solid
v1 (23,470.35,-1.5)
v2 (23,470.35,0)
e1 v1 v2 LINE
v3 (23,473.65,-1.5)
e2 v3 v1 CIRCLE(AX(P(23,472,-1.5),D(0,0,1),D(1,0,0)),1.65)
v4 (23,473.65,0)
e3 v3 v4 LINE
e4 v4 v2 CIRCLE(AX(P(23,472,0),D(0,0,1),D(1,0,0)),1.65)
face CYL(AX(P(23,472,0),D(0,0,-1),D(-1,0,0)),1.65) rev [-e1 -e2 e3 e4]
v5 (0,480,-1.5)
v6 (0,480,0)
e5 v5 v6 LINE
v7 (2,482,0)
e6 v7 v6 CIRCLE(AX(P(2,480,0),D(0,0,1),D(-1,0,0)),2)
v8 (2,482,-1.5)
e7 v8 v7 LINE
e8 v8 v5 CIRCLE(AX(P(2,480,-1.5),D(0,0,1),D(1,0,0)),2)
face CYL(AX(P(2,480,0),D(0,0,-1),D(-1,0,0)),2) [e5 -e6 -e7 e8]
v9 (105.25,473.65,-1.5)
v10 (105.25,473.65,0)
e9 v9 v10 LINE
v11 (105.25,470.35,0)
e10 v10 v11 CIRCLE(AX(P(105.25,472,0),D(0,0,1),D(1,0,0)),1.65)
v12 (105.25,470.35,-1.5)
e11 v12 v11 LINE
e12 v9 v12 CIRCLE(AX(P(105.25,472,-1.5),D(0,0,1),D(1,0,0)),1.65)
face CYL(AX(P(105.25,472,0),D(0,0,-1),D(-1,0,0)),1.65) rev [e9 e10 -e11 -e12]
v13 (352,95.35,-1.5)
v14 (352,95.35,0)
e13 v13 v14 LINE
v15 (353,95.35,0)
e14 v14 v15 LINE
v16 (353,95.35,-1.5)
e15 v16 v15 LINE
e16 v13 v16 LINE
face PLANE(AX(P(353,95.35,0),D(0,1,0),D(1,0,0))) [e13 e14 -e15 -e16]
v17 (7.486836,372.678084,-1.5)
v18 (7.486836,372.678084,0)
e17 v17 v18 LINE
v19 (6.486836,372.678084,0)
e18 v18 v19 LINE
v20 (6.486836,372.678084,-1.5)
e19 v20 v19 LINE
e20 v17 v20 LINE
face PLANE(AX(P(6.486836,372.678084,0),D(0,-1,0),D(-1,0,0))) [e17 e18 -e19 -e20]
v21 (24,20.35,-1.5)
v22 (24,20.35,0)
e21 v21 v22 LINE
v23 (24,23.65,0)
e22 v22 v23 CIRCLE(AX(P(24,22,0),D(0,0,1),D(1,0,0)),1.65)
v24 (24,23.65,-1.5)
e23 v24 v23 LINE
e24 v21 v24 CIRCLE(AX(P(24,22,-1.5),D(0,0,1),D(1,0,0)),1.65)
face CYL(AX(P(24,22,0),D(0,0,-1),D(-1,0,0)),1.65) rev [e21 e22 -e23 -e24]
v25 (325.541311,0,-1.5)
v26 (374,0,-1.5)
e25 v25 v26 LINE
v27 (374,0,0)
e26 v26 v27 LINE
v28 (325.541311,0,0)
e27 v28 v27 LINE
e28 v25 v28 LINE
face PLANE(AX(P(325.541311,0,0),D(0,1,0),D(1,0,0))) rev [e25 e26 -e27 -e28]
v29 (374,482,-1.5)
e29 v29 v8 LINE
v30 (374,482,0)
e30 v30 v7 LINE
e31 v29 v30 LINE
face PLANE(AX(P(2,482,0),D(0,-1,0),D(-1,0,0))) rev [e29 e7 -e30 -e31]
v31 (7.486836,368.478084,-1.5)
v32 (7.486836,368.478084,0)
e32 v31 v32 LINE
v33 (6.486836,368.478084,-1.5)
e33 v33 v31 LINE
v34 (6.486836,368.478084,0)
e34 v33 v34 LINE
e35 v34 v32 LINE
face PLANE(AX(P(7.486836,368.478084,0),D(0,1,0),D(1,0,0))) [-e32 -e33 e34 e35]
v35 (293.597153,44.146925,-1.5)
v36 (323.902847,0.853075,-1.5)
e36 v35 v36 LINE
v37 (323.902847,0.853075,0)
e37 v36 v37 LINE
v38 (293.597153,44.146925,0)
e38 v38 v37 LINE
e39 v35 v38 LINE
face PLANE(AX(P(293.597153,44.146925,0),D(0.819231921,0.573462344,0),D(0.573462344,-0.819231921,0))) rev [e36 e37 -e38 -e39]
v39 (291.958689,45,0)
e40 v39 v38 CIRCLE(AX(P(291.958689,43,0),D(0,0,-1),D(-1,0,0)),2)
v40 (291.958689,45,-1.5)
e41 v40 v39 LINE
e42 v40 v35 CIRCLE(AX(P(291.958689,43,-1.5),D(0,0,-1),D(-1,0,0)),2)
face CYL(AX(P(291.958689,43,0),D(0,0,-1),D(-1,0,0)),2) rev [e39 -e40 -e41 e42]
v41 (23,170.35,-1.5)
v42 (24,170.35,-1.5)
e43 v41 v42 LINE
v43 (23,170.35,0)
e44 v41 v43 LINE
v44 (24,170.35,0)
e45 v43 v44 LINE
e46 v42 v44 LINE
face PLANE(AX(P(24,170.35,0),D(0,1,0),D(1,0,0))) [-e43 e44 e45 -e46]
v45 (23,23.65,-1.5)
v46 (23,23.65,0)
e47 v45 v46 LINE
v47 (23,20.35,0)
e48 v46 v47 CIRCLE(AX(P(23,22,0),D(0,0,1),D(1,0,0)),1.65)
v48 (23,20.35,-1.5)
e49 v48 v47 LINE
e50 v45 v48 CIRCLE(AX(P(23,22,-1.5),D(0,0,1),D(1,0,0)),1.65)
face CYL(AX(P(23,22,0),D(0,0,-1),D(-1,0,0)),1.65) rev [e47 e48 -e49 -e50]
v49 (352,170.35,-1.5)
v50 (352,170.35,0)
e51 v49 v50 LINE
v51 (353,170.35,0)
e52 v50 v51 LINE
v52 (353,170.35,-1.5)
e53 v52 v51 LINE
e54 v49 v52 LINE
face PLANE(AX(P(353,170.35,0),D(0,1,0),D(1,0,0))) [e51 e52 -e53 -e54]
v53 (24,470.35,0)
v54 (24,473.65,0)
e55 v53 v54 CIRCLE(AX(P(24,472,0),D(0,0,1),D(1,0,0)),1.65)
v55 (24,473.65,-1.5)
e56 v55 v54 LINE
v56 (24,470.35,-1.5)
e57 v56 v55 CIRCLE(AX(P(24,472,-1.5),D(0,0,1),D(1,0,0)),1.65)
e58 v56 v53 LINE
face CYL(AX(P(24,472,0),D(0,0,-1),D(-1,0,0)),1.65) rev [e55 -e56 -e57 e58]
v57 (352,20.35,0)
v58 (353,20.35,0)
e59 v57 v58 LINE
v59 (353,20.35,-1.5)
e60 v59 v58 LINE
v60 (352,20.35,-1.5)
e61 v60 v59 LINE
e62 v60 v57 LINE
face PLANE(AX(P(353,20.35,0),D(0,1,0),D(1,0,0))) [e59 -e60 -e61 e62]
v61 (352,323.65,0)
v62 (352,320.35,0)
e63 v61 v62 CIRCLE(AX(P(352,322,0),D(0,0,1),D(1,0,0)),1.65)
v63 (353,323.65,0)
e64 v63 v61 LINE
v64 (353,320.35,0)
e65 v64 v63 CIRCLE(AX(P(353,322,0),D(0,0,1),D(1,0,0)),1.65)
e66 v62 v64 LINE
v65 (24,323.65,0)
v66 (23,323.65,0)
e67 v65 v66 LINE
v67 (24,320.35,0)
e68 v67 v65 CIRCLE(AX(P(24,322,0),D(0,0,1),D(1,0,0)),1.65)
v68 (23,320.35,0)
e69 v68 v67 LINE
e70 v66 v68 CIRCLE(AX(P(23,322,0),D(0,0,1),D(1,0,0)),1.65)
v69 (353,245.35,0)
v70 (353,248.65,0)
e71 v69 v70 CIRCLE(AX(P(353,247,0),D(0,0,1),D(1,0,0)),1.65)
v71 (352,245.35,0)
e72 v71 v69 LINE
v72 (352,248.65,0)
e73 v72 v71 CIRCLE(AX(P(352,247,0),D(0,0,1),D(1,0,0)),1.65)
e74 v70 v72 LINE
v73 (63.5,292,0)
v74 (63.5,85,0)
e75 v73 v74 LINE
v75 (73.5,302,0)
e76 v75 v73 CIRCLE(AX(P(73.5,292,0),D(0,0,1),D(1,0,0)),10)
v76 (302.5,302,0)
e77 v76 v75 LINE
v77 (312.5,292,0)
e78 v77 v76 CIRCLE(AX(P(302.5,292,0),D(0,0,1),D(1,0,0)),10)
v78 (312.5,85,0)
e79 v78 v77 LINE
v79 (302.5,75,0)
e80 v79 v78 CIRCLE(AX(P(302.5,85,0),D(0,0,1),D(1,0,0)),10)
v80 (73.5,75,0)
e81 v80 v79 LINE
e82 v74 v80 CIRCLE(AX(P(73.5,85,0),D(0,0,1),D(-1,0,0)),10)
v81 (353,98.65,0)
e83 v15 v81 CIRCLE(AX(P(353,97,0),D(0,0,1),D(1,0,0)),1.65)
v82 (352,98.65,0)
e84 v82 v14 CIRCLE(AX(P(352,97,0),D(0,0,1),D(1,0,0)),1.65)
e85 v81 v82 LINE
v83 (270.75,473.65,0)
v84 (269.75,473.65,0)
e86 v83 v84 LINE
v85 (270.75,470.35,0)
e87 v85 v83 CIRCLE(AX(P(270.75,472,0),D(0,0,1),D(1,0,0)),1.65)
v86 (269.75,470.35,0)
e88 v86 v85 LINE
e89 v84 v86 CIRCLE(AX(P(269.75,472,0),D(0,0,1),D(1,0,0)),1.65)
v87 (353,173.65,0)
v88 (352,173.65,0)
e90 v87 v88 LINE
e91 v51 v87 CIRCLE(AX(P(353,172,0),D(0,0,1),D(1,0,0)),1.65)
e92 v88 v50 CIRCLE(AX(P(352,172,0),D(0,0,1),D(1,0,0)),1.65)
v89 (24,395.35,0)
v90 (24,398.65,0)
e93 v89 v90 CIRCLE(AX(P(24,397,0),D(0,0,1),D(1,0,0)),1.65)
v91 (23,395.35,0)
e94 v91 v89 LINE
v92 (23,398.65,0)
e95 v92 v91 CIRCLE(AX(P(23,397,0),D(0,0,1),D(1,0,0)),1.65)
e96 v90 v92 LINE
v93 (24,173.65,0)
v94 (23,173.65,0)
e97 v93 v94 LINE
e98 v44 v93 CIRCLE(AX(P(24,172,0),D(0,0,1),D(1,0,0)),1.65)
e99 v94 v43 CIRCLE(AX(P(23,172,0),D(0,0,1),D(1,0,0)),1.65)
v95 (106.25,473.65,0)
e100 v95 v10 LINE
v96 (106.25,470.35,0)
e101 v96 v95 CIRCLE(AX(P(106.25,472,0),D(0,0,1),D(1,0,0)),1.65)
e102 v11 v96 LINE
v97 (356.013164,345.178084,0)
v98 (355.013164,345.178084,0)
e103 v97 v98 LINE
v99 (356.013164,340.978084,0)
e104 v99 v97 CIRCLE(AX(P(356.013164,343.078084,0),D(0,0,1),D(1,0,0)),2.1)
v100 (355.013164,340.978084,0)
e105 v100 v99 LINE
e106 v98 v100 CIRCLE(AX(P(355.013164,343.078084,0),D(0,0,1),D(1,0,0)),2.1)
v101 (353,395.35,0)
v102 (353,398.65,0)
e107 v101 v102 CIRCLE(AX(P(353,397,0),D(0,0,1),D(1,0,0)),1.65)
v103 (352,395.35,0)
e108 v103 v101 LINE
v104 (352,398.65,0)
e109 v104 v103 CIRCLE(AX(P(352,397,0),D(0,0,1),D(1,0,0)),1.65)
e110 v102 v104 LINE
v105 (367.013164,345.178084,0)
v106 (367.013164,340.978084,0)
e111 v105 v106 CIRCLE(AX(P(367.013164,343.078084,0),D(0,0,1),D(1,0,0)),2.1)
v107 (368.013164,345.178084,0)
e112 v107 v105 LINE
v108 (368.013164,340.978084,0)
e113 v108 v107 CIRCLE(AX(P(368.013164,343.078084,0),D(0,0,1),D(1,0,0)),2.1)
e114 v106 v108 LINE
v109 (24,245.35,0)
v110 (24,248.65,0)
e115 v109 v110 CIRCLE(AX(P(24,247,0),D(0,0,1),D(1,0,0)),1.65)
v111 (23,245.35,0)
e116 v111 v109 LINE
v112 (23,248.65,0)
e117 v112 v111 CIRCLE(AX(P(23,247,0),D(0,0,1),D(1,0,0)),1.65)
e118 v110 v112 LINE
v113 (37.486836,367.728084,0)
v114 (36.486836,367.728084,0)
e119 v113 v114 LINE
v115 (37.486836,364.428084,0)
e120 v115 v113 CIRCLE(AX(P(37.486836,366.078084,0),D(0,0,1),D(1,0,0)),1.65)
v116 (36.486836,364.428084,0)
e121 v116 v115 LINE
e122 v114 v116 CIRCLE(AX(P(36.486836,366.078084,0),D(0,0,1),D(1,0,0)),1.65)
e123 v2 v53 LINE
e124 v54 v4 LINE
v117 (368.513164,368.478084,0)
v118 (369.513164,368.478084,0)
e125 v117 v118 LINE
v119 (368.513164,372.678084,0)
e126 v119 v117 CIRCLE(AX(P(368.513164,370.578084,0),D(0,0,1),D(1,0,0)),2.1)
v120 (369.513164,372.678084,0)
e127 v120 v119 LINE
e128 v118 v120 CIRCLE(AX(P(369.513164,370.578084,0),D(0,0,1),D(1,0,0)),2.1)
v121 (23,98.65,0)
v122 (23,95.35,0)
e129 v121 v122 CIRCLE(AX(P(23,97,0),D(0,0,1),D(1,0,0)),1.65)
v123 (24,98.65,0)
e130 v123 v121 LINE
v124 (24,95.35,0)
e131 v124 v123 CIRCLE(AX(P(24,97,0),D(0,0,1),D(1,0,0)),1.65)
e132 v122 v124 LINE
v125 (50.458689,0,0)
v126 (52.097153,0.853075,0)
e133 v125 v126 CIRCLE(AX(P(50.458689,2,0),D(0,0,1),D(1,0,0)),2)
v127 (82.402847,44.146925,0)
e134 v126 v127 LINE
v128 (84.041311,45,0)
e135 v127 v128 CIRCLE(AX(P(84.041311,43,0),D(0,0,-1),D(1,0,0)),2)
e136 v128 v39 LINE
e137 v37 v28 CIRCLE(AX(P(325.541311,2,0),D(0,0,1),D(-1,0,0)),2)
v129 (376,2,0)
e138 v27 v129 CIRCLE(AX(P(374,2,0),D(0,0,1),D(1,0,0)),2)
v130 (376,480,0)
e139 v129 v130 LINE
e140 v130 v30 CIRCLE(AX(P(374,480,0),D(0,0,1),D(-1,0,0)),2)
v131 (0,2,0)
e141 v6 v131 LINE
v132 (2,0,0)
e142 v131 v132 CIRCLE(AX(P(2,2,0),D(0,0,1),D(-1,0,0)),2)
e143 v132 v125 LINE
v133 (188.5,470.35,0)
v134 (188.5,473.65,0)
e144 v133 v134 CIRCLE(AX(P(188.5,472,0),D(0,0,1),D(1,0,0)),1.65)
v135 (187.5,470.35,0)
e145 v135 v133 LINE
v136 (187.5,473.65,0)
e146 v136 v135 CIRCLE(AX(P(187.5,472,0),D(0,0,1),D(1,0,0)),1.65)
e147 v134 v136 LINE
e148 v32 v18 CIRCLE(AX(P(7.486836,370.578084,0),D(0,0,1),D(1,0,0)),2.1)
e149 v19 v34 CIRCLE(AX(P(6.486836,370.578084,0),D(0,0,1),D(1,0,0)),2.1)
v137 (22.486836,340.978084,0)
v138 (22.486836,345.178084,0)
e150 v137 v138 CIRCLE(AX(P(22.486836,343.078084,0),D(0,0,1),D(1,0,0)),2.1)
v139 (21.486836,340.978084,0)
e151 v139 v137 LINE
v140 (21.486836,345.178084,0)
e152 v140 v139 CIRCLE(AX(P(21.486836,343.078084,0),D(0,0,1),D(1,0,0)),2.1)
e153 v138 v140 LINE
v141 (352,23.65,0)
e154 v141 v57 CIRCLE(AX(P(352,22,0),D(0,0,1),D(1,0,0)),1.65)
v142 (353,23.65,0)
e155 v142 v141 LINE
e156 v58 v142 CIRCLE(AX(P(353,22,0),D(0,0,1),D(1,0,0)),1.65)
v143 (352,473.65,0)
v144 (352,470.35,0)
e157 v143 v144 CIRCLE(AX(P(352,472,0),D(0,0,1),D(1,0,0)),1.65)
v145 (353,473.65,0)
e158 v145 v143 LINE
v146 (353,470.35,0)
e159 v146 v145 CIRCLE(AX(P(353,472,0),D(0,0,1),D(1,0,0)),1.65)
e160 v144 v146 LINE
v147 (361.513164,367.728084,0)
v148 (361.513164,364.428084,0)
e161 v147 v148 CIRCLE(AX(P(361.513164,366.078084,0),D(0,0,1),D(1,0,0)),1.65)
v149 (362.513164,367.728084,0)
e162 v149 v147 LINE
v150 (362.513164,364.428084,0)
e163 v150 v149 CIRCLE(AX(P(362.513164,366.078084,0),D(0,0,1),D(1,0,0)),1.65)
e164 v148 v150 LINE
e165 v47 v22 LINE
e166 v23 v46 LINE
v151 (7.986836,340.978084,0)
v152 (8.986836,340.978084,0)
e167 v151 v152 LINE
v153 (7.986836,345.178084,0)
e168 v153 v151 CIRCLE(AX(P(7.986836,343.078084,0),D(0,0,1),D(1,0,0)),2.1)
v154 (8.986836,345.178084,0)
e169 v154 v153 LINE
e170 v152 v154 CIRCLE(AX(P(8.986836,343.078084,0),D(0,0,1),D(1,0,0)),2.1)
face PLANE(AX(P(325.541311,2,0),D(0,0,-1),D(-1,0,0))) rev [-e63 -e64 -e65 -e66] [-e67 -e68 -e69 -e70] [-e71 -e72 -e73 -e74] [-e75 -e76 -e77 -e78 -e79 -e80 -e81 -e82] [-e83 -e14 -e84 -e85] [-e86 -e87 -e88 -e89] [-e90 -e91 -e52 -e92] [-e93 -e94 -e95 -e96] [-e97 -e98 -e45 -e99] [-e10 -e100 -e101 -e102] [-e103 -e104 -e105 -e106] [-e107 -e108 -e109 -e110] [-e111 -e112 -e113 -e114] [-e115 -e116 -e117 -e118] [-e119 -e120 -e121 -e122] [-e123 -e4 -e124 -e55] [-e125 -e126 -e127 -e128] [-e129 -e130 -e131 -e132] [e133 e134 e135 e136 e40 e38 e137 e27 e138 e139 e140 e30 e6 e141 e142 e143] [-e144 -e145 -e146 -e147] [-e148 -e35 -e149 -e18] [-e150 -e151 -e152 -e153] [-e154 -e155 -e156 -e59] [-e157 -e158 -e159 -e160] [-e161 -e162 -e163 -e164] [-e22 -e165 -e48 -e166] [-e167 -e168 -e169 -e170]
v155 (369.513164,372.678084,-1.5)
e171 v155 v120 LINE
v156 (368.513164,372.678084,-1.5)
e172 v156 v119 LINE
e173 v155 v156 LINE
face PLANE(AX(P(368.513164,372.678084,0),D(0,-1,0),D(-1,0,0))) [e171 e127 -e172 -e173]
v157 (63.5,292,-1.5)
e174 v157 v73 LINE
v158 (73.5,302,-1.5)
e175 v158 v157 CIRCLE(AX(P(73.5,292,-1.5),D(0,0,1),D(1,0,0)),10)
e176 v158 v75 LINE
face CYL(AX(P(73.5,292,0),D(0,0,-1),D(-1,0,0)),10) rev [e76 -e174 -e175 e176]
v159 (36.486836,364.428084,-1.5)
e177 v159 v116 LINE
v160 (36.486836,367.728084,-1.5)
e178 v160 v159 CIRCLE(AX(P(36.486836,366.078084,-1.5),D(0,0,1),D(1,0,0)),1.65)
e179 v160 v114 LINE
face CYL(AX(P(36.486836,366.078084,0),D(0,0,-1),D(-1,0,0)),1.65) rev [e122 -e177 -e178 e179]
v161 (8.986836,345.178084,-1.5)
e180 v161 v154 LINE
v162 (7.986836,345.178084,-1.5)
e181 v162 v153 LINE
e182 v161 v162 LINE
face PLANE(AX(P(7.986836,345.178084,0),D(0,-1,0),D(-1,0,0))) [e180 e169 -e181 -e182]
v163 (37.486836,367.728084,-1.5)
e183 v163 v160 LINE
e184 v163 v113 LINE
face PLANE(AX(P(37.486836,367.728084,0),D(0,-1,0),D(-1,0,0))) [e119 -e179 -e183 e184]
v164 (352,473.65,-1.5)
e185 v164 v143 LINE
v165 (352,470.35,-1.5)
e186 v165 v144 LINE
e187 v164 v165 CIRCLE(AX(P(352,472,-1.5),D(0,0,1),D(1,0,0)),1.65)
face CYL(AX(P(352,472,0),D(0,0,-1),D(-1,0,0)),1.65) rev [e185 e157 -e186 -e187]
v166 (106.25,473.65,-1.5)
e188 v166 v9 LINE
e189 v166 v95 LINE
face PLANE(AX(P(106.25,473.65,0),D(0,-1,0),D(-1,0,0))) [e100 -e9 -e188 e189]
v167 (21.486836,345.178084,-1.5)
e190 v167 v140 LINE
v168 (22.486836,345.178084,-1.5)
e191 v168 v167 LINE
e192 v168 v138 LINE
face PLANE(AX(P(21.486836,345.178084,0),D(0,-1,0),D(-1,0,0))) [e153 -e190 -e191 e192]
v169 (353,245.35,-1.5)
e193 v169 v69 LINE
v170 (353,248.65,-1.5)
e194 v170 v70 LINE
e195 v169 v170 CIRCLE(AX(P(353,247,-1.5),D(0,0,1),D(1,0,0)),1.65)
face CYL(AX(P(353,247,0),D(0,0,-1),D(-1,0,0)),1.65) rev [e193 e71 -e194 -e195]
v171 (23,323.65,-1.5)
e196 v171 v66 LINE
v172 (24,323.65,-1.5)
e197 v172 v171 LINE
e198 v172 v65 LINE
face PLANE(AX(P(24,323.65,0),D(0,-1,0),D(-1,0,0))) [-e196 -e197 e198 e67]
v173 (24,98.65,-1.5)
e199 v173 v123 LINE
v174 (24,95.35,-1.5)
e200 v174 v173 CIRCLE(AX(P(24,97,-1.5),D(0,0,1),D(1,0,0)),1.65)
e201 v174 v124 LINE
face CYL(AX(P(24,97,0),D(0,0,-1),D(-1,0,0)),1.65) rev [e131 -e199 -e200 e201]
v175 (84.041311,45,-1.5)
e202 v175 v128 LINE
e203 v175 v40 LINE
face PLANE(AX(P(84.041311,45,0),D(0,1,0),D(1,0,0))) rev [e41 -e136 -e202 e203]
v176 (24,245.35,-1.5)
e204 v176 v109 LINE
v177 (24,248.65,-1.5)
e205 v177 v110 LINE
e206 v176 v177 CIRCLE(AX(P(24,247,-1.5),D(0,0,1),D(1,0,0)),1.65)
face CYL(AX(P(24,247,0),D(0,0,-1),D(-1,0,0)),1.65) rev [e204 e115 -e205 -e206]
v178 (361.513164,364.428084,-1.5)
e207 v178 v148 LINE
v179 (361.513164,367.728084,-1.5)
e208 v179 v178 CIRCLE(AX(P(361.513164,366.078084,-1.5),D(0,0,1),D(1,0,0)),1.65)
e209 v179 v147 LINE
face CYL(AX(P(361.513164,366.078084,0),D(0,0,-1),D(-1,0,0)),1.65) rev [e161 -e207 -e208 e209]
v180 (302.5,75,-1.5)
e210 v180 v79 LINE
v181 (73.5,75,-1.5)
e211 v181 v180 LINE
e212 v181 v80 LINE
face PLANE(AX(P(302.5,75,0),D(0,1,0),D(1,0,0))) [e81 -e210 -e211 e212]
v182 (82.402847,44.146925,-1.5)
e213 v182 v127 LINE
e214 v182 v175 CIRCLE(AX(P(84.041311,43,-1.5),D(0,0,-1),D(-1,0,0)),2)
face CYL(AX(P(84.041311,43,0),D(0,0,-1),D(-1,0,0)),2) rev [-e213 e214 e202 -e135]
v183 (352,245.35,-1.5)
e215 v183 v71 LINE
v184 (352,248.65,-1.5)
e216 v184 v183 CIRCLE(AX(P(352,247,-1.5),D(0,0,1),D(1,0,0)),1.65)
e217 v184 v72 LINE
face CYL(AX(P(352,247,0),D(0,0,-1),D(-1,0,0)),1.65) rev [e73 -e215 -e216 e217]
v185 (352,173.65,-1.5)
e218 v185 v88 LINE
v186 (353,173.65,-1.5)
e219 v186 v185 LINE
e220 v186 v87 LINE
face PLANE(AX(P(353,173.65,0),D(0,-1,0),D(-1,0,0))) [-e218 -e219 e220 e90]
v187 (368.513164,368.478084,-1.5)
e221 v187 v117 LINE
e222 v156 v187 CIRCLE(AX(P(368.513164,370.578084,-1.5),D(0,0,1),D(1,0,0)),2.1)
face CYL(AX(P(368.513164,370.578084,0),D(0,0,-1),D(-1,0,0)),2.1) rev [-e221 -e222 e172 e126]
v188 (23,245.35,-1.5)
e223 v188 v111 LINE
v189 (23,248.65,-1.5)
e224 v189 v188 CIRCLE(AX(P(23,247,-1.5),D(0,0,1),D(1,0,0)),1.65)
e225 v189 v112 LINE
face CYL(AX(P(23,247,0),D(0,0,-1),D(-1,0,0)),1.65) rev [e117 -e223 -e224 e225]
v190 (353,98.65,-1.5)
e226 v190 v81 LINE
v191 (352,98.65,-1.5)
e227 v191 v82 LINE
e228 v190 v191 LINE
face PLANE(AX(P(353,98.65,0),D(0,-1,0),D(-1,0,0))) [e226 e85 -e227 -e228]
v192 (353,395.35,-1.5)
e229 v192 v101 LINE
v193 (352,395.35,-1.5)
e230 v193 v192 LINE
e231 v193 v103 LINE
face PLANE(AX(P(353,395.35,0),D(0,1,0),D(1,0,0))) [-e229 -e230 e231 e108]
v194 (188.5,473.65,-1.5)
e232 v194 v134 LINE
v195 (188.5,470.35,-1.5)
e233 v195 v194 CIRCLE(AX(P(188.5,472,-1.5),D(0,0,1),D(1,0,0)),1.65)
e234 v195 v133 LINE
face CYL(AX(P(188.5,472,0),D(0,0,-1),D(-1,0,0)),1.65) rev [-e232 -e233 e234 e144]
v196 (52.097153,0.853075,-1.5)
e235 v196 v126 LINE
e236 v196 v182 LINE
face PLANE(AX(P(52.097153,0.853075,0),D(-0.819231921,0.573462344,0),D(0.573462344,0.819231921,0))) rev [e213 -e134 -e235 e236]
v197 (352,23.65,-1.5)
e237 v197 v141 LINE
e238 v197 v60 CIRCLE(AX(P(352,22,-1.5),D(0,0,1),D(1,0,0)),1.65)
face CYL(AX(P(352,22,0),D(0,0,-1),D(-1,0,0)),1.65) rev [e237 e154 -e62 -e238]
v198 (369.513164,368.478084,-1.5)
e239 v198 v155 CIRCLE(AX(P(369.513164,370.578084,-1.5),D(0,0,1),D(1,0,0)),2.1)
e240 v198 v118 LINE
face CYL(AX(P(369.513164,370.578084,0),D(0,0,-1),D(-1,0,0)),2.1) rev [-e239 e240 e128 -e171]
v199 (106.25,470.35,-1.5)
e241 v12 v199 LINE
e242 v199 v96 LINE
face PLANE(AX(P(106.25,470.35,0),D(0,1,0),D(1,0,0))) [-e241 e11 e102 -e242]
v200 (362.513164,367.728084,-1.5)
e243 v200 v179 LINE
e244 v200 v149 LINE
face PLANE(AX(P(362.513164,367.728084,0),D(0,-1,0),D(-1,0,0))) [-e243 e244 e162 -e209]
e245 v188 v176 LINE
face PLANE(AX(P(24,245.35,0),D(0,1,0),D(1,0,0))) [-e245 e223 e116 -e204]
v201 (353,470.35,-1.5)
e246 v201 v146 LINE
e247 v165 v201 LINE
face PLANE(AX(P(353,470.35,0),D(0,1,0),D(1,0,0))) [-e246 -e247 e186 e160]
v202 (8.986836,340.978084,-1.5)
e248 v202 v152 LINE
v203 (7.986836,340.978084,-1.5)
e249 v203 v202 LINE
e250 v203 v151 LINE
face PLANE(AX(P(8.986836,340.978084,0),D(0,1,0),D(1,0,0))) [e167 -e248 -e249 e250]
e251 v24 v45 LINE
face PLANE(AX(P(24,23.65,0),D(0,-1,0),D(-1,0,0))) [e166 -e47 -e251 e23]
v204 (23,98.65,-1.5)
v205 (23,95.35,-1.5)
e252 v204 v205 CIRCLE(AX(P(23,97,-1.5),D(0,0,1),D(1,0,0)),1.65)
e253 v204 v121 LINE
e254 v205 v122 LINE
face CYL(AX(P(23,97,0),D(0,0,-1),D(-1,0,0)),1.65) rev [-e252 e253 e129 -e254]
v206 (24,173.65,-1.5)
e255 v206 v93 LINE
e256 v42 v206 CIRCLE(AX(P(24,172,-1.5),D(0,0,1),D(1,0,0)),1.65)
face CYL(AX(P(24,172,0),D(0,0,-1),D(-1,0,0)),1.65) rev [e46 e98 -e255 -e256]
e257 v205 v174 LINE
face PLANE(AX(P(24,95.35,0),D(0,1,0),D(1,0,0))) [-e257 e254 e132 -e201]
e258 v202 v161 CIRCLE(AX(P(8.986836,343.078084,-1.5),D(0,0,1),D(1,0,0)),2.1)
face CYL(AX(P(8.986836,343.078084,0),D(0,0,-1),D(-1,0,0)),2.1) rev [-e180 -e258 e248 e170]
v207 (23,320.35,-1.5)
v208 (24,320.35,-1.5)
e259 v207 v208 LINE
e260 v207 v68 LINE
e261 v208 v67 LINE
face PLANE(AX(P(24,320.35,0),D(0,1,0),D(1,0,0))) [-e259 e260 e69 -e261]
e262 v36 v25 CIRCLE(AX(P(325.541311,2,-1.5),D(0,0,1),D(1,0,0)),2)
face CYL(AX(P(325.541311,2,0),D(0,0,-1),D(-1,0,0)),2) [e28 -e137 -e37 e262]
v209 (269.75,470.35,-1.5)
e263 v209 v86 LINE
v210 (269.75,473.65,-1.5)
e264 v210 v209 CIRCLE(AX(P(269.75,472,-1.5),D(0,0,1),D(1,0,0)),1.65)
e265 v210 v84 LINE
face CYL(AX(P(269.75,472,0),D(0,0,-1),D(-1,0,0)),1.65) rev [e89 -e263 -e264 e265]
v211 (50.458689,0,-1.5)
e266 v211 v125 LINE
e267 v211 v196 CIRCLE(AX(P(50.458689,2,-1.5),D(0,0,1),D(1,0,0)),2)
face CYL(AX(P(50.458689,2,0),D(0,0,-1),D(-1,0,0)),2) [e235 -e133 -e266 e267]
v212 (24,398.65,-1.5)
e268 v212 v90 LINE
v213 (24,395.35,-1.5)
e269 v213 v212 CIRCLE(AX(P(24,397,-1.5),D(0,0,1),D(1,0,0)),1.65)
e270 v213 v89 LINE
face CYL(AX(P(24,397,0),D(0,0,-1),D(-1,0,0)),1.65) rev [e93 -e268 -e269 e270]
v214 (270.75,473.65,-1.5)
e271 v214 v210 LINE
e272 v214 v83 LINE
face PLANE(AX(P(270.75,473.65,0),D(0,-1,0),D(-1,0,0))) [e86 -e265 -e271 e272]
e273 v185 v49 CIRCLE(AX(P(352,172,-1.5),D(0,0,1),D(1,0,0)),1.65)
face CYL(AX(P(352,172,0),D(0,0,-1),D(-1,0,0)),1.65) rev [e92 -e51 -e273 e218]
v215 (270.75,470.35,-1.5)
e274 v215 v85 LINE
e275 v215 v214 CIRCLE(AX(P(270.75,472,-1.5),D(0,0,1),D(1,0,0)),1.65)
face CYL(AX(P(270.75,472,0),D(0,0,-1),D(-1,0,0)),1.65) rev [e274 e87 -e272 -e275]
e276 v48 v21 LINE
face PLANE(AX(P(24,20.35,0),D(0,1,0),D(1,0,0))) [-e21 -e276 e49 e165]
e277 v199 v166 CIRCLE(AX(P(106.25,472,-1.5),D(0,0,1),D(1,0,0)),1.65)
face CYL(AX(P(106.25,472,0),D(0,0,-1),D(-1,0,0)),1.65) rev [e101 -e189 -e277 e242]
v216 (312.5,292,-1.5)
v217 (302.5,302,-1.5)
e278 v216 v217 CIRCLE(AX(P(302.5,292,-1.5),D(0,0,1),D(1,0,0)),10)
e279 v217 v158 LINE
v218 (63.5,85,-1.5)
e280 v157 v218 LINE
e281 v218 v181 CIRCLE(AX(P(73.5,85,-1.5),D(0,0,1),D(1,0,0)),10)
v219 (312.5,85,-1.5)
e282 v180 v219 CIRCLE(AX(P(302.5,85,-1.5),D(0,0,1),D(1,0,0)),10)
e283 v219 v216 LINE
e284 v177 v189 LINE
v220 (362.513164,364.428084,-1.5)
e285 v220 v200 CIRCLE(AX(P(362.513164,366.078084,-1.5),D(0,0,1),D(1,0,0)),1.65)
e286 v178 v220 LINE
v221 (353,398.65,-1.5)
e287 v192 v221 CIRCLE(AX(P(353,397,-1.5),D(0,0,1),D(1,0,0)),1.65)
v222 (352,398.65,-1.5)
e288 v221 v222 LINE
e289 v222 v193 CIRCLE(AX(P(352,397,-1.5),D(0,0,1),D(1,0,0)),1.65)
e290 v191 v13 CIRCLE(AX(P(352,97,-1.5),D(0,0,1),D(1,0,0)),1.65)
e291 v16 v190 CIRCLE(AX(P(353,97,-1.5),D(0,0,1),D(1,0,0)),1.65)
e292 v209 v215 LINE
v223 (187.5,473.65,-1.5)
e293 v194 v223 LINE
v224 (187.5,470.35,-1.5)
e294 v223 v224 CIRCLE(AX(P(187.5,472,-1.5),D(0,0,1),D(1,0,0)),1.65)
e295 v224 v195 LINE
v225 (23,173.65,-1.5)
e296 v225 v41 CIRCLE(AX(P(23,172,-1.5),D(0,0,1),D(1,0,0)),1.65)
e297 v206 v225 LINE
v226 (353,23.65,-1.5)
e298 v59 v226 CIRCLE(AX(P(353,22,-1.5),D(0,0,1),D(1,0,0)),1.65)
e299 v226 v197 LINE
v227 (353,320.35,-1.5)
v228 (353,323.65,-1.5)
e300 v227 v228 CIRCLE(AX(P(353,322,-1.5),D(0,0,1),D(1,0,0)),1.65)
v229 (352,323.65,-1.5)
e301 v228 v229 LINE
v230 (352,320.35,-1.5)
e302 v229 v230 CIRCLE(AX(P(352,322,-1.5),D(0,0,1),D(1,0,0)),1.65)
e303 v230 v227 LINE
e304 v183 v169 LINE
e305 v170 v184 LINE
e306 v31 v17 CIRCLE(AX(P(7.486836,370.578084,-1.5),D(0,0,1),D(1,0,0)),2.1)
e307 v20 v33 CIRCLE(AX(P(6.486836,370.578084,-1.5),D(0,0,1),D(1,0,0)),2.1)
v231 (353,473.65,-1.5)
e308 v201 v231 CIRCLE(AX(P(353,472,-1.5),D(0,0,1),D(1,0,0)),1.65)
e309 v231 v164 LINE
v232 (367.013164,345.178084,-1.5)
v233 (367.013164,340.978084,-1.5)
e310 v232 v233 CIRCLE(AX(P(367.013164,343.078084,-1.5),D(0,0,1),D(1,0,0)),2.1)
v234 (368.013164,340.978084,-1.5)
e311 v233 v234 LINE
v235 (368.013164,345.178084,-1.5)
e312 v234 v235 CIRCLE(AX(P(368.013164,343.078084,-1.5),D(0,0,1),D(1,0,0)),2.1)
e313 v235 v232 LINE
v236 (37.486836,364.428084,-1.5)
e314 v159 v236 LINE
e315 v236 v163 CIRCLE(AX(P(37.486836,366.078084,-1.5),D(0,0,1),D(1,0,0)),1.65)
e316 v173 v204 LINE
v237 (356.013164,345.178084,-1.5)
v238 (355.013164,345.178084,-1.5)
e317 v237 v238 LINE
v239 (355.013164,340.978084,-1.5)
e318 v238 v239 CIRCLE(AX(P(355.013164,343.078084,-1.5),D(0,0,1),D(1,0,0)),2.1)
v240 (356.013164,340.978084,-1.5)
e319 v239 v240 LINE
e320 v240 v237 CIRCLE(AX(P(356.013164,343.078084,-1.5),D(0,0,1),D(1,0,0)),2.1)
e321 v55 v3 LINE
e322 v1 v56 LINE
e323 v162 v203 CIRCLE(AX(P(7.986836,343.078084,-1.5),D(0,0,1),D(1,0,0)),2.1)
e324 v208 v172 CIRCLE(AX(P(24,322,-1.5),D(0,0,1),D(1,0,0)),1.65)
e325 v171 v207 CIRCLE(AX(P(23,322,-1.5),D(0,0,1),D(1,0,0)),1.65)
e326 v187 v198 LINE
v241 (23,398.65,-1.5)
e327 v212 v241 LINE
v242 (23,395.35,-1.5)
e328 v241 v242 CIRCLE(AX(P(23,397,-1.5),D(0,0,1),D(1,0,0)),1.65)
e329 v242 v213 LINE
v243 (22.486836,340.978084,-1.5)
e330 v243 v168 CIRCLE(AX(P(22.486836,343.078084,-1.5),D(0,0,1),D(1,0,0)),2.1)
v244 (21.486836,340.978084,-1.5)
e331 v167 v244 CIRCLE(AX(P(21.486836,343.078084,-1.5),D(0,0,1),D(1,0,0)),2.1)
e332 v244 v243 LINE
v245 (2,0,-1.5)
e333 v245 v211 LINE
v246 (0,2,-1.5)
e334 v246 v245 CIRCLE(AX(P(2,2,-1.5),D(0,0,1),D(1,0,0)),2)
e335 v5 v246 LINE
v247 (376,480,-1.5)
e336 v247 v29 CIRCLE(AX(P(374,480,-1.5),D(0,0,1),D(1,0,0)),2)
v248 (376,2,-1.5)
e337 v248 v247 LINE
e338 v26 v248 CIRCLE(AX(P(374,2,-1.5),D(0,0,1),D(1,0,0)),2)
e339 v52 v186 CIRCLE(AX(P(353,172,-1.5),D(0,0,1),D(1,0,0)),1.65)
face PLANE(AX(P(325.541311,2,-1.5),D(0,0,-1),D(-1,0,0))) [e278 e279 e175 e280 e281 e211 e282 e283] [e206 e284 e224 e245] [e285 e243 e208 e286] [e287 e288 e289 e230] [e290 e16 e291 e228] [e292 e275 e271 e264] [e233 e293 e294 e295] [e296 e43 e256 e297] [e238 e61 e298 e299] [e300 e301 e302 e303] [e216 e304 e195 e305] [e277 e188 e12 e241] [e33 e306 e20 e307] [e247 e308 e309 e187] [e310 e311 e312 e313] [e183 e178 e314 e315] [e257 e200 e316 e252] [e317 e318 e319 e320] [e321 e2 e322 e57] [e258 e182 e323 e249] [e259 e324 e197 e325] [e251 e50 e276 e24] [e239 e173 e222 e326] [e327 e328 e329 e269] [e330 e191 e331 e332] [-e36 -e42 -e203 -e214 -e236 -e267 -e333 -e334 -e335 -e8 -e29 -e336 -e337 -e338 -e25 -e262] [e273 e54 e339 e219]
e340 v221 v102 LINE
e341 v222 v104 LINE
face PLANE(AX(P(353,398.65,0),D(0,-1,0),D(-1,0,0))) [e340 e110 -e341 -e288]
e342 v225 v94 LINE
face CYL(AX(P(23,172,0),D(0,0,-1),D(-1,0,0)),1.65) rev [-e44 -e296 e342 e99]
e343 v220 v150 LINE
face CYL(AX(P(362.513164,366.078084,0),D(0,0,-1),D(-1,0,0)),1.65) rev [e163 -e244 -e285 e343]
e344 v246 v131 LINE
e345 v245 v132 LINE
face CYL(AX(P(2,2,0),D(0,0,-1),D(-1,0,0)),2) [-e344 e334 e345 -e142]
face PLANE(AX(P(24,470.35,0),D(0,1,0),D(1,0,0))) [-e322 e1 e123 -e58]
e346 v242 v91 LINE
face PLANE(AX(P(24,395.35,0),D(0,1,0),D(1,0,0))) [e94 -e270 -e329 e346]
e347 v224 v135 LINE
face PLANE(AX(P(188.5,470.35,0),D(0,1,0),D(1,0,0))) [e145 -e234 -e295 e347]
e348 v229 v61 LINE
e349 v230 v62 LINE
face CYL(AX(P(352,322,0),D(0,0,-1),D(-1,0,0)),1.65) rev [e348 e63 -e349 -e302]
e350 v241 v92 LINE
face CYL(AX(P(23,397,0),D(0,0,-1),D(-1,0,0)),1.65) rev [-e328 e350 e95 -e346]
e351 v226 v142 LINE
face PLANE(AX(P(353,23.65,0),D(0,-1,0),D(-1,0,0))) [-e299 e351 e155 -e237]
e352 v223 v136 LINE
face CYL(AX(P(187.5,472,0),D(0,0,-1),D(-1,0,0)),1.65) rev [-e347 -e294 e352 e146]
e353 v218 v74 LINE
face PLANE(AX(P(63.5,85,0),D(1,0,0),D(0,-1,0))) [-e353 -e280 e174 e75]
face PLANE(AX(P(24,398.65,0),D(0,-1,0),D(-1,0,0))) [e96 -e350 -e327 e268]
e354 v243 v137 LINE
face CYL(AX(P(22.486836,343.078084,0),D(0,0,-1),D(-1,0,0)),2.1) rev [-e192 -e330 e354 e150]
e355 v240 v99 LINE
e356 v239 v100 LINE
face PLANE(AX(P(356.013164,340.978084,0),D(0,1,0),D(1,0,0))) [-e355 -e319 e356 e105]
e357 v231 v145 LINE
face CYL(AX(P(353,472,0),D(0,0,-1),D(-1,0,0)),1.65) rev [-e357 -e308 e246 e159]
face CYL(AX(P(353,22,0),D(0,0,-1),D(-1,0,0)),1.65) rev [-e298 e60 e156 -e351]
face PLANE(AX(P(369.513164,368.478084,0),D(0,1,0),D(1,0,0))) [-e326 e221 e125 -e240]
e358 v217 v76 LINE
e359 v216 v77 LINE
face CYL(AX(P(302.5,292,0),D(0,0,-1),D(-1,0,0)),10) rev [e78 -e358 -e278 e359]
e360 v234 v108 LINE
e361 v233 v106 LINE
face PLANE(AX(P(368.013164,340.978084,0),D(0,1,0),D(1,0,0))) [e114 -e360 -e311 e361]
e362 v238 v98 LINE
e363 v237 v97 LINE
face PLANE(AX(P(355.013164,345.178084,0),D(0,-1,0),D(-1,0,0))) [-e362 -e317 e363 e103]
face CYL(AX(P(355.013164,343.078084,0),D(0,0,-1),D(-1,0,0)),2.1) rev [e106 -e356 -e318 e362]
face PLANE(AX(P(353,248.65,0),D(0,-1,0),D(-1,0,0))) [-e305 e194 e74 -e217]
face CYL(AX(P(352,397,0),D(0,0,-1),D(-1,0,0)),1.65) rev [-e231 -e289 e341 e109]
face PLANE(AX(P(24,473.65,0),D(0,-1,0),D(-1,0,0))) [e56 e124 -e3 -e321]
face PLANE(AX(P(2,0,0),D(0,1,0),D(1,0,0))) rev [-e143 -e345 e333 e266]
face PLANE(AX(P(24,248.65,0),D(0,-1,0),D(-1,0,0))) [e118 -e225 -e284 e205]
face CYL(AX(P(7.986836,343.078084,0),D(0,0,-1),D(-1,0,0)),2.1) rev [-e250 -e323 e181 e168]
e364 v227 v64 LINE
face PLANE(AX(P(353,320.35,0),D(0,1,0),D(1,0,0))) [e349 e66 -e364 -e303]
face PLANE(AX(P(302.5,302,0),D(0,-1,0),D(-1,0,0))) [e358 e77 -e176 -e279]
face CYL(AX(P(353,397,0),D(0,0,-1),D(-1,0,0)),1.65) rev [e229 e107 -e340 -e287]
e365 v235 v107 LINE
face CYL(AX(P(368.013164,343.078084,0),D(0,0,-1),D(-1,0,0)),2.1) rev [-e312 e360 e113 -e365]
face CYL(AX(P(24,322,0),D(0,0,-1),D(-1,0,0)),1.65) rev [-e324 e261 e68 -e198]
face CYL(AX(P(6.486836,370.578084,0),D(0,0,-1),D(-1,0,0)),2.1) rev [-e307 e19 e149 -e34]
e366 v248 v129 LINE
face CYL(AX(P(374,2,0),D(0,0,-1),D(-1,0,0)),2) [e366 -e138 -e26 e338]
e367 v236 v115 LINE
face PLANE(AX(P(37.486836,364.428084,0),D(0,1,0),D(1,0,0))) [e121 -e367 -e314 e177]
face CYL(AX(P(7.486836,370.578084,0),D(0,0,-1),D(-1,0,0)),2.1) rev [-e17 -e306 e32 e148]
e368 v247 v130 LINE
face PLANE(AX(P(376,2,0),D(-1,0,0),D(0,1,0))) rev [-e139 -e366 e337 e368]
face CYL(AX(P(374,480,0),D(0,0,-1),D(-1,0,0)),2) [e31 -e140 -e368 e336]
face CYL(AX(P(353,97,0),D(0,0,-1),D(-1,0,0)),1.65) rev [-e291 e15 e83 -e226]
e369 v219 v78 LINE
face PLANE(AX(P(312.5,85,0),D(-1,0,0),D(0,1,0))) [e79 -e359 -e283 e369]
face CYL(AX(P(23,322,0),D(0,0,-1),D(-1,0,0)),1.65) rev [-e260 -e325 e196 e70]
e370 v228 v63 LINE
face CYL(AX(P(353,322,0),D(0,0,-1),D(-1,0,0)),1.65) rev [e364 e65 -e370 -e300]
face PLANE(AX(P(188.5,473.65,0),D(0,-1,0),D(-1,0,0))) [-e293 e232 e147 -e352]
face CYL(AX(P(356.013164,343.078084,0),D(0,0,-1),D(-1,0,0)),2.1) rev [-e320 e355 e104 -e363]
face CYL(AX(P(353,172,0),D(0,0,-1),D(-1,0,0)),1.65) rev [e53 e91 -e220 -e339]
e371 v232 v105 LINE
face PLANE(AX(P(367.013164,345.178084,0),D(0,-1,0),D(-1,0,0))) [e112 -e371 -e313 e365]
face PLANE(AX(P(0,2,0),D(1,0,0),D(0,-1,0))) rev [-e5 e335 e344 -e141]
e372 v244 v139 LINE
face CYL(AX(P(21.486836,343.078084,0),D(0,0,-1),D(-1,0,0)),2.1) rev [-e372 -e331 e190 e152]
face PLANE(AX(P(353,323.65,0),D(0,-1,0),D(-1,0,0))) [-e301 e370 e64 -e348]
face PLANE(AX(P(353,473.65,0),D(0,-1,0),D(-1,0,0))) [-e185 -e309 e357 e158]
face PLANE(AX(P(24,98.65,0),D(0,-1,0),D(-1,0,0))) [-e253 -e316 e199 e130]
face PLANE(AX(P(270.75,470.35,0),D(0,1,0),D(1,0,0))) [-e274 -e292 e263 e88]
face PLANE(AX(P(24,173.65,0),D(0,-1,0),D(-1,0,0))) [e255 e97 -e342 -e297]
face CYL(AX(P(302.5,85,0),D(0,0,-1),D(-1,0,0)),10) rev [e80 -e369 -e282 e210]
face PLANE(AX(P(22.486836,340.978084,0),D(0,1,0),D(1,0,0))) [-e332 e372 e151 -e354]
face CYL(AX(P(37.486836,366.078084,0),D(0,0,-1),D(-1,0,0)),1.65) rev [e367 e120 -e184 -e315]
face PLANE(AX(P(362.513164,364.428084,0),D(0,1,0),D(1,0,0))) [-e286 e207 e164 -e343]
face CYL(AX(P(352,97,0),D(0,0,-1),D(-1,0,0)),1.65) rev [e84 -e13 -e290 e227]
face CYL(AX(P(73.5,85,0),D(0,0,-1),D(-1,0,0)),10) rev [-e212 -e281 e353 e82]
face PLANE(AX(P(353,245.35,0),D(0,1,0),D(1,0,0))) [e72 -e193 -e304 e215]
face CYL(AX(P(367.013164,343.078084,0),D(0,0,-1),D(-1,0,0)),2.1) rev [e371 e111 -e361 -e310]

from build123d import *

# Parameters (mm, degrees)
CONVERT_SOLID1_START = -1.5
CONVERT_SOLID1_DEPTH = 1.5


# Read off the part's stored shape, not the designer's step: Convert-Solid1
with BuildPart() as part:
    # Convert-Solid1 outline → Convert-Solid1 (new body)
    with BuildSketch(Plane.XY.offset(CONVERT_SOLID1_START)):
        with BuildLine():
            ThreePointArc((374, 0), (375.414213562, 0.585786438), (376, 2))
            Line((376, 2), (376, 480))
            ThreePointArc((376, 480), (375.414213562, 481.414213562), (374, 482))
            Line((374, 482), (2, 482))
            ThreePointArc((2, 482), (0.585786438, 481.414213562), (0, 480))
            Line((0, 480), (0, 2))
            ThreePointArc((0, 2), (0.585786438, 0.585786438), (2, 0))
            Line((2, 0), (50.458688877, 0))
            ThreePointArc((50.458688877, 0), (51.382309639, 0.226042647), (52.097152718, 0.853075311))
            Line((52.097152718, 0.853075311), (82.402847282, 44.146924689))
            ThreePointArc((82.402847282, 44.146924689), (83.117690361, 44.773957353), (84.041311123, 45))
            Line((84.041311123, 45), (291.958688877, 45))
            ThreePointArc((291.958688877, 45), (292.882309639, 44.773957353), (293.597152718, 44.146924689))
            Line((293.597152718, 44.146924689), (323.902847282, 0.853075311))
            ThreePointArc((323.902847282, 0.853075311), (324.617690361, 0.226042647), (325.541311123, 0))
            Line((325.541311123, 0), (374, 0))
        make_face()
        with BuildLine():
            Line((23, 23.65), (24, 23.65))
            ThreePointArc((24, 23.65), (25.65, 22), (24, 20.35))
            Line((24, 20.35), (23, 20.35))
            ThreePointArc((23, 20.35), (21.35, 22), (23, 23.65))
        make_face(mode=Mode.SUBTRACT)
        with BuildLine():
            Line((23, 98.65), (24, 98.65))
            ThreePointArc((24, 98.65), (25.65, 97), (24, 95.35))
            Line((24, 95.35), (23, 95.35))
            ThreePointArc((23, 95.35), (21.35, 97), (23, 98.65))
        make_face(mode=Mode.SUBTRACT)
        with BuildLine():
            Line((23, 173.65), (24, 173.65))
            ThreePointArc((24, 173.65), (25.65, 172), (24, 170.35))
            Line((24, 170.35), (23, 170.35))
            ThreePointArc((23, 170.35), (21.35, 172), (23, 173.65))
        make_face(mode=Mode.SUBTRACT)
        with BuildLine():
            Line((352, 23.65), (353, 23.65))
            ThreePointArc((353, 23.65), (354.65, 22), (353, 20.35))
            Line((353, 20.35), (352, 20.35))
            ThreePointArc((352, 20.35), (350.35, 22), (352, 23.65))
        make_face(mode=Mode.SUBTRACT)
        with BuildLine():
            Line((352, 98.65), (353, 98.65))
            ThreePointArc((353, 98.65), (354.65, 97), (353, 95.35))
            Line((353, 95.35), (352, 95.35))
            ThreePointArc((352, 95.35), (350.35, 97), (352, 98.65))
        make_face(mode=Mode.SUBTRACT)
        with BuildLine():
            Line((302.5, 75), (73.5, 75))
            ThreePointArc((73.5, 75), (66.428932188, 77.928932188), (63.5, 85))
            Line((63.5, 85), (63.5, 292))
            ThreePointArc((63.5, 292), (66.428932188, 299.071067812), (73.5, 302))
            Line((73.5, 302), (302.5, 302))
            ThreePointArc((302.5, 302), (309.571067812, 299.071067812), (312.5, 292))
            Line((312.5, 292), (312.5, 85))
            ThreePointArc((312.5, 85), (309.571067812, 77.928932188), (302.5, 75))
        make_face(mode=Mode.SUBTRACT)
        with BuildLine():
            Line((352, 173.65), (353, 173.65))
            ThreePointArc((353, 173.65), (354.65, 172), (353, 170.35))
            Line((353, 170.35), (352, 170.35))
            ThreePointArc((352, 170.35), (350.35, 172), (352, 173.65))
        make_face(mode=Mode.SUBTRACT)
        with BuildLine():
            Line((23, 248.65), (24, 248.65))
            ThreePointArc((24, 248.65), (25.65, 247), (24, 245.35))
            Line((24, 245.35), (23, 245.35))
            ThreePointArc((23, 245.35), (21.35, 247), (23, 248.65))
        make_face(mode=Mode.SUBTRACT)
        with BuildLine():
            Line((23, 323.65), (24, 323.65))
            ThreePointArc((24, 323.65), (25.65, 322), (24, 320.35))
            Line((24, 320.35), (23, 320.35))
            ThreePointArc((23, 320.35), (21.35, 322), (23, 323.65))
        make_face(mode=Mode.SUBTRACT)
        with BuildLine():
            Line((7.98683607, 345.178083895), (8.98683607, 345.178083895))
            ThreePointArc((8.98683607, 345.178083895), (11.08683607, 343.078083895), (8.98683607, 340.978083895))
            Line((8.98683607, 340.978083895), (7.98683607, 340.978083895))
            ThreePointArc((7.98683607, 340.978083895), (5.88683607, 343.078083895), (7.98683607, 345.178083895))
        make_face(mode=Mode.SUBTRACT)
        with BuildLine():
            Line((21.48683607, 345.178083895), (22.48683607, 345.178083895))
            ThreePointArc((22.48683607, 345.178083895), (24.58683607, 343.078083895), (22.48683607, 340.978083895))
            Line((22.48683607, 340.978083895), (21.48683607, 340.978083895))
            ThreePointArc((21.48683607, 340.978083895), (19.38683607, 343.078083895), (21.48683607, 345.178083895))
        make_face(mode=Mode.SUBTRACT)
        with BuildLine():
            Line((6.48683607, 372.678083895), (7.48683607, 372.678083895))
            ThreePointArc((7.48683607, 372.678083895), (9.58683607, 370.578083895), (7.48683607, 368.478083895))
            Line((7.48683607, 368.478083895), (6.48683607, 368.478083895))
            ThreePointArc((6.48683607, 368.478083895), (4.38683607, 370.578083895), (6.48683607, 372.678083895))
        make_face(mode=Mode.SUBTRACT)
        with BuildLine():
            Line((36.48683607, 367.728083895), (37.48683607, 367.728083895))
            ThreePointArc((37.48683607, 367.728083895), (39.13683607, 366.078083895), (37.48683607, 364.428083895))
            Line((37.48683607, 364.428083895), (36.48683607, 364.428083895))
            ThreePointArc((36.48683607, 364.428083895), (34.83683607, 366.078083895), (36.48683607, 367.728083895))
        make_face(mode=Mode.SUBTRACT)
        with BuildLine():
            Line((23, 398.65), (24, 398.65))
            ThreePointArc((24, 398.65), (25.65, 397), (24, 395.35))
            Line((24, 395.35), (23, 395.35))
            ThreePointArc((23, 395.35), (21.35, 397), (23, 398.65))
        make_face(mode=Mode.SUBTRACT)
        with BuildLine():
            Line((23, 473.65), (24, 473.65))
            ThreePointArc((24, 473.65), (25.65, 472), (24, 470.35))
            Line((24, 470.35), (23, 470.35))
            ThreePointArc((23, 470.35), (21.35, 472), (23, 473.65))
        make_face(mode=Mode.SUBTRACT)
        with BuildLine():
            Line((105.25, 473.65), (106.25, 473.65))
            ThreePointArc((106.25, 473.65), (107.9, 472), (106.25, 470.35))
            Line((106.25, 470.35), (105.25, 470.35))
            ThreePointArc((105.25, 470.35), (103.6, 472), (105.25, 473.65))
        make_face(mode=Mode.SUBTRACT)
        with BuildLine():
            Line((352, 248.65), (353, 248.65))
            ThreePointArc((353, 248.65), (354.65, 247), (353, 245.35))
            Line((353, 245.35), (352, 245.35))
            ThreePointArc((352, 245.35), (350.35, 247), (352, 248.65))
        make_face(mode=Mode.SUBTRACT)
        with BuildLine():
            Line((352, 323.65), (353, 323.65))
            ThreePointArc((353, 323.65), (354.65, 322), (353, 320.35))
            Line((353, 320.35), (352, 320.35))
            ThreePointArc((352, 320.35), (350.35, 322), (352, 323.65))
        make_face(mode=Mode.SUBTRACT)
        with BuildLine():
            Line((355.01316393, 345.178083895), (356.01316393, 345.178083895))
            ThreePointArc((356.01316393, 345.178083895), (358.11316393, 343.078083895), (356.01316393, 340.978083895))
            Line((356.01316393, 340.978083895), (355.01316393, 340.978083895))
            ThreePointArc((355.01316393, 340.978083895), (352.91316393, 343.078083895), (355.01316393, 345.178083895))
        make_face(mode=Mode.SUBTRACT)
        with BuildLine():
            Line((367.01316393, 345.178083895), (368.01316393, 345.178083895))
            ThreePointArc((368.01316393, 345.178083895), (370.11316393, 343.078083895), (368.01316393, 340.978083895))
            Line((368.01316393, 340.978083895), (367.01316393, 340.978083895))
            ThreePointArc((367.01316393, 340.978083895), (364.91316393, 343.078083895), (367.01316393, 345.178083895))
        make_face(mode=Mode.SUBTRACT)
        with BuildLine():
            Line((187.5, 473.65), (188.5, 473.65))
            ThreePointArc((188.5, 473.65), (190.15, 472), (188.5, 470.35))
            Line((188.5, 470.35), (187.5, 470.35))
            ThreePointArc((187.5, 470.35), (185.85, 472), (187.5, 473.65))
        make_face(mode=Mode.SUBTRACT)
        with BuildLine():
            Line((269.75, 473.65), (270.75, 473.65))
            ThreePointArc((270.75, 473.65), (272.4, 472), (270.75, 470.35))
            Line((270.75, 470.35), (269.75, 470.35))
            ThreePointArc((269.75, 470.35), (268.1, 472), (269.75, 473.65))
        make_face(mode=Mode.SUBTRACT)
        with BuildLine():
            Line((361.51316393, 367.728083895), (362.51316393, 367.728083895))
            ThreePointArc((362.51316393, 367.728083895), (364.16316393, 366.078083895), (362.51316393, 364.428083895))
            Line((362.51316393, 364.428083895), (361.51316393, 364.428083895))
            ThreePointArc((361.51316393, 364.428083895), (359.86316393, 366.078083895), (361.51316393, 367.728083895))
        make_face(mode=Mode.SUBTRACT)
        with BuildLine():
            Line((368.51316393, 372.678083895), (369.51316393, 372.678083895))
            ThreePointArc((369.51316393, 372.678083895), (371.61316393, 370.578083895), (369.51316393, 368.478083895))
            Line((369.51316393, 368.478083895), (368.51316393, 368.478083895))
            ThreePointArc((368.51316393, 368.478083895), (366.41316393, 370.578083895), (368.51316393, 372.678083895))
        make_face(mode=Mode.SUBTRACT)
        with BuildLine():
            Line((352, 398.65), (353, 398.65))
            ThreePointArc((353, 398.65), (354.65, 397), (353, 395.35))
            Line((353, 395.35), (352, 395.35))
            ThreePointArc((352, 395.35), (350.35, 397), (352, 398.65))
        make_face(mode=Mode.SUBTRACT)
        with BuildLine():
            Line((352, 473.65), (353, 473.65))
            ThreePointArc((353, 473.65), (354.65, 472), (353, 470.35))
            Line((353, 470.35), (352, 470.35))
            ThreePointArc((352, 470.35), (350.35, 472), (352, 473.65))
        make_face(mode=Mode.SUBTRACT)
    extrude(amount=CONVERT_SOLID1_DEPTH)


solid = part.part
